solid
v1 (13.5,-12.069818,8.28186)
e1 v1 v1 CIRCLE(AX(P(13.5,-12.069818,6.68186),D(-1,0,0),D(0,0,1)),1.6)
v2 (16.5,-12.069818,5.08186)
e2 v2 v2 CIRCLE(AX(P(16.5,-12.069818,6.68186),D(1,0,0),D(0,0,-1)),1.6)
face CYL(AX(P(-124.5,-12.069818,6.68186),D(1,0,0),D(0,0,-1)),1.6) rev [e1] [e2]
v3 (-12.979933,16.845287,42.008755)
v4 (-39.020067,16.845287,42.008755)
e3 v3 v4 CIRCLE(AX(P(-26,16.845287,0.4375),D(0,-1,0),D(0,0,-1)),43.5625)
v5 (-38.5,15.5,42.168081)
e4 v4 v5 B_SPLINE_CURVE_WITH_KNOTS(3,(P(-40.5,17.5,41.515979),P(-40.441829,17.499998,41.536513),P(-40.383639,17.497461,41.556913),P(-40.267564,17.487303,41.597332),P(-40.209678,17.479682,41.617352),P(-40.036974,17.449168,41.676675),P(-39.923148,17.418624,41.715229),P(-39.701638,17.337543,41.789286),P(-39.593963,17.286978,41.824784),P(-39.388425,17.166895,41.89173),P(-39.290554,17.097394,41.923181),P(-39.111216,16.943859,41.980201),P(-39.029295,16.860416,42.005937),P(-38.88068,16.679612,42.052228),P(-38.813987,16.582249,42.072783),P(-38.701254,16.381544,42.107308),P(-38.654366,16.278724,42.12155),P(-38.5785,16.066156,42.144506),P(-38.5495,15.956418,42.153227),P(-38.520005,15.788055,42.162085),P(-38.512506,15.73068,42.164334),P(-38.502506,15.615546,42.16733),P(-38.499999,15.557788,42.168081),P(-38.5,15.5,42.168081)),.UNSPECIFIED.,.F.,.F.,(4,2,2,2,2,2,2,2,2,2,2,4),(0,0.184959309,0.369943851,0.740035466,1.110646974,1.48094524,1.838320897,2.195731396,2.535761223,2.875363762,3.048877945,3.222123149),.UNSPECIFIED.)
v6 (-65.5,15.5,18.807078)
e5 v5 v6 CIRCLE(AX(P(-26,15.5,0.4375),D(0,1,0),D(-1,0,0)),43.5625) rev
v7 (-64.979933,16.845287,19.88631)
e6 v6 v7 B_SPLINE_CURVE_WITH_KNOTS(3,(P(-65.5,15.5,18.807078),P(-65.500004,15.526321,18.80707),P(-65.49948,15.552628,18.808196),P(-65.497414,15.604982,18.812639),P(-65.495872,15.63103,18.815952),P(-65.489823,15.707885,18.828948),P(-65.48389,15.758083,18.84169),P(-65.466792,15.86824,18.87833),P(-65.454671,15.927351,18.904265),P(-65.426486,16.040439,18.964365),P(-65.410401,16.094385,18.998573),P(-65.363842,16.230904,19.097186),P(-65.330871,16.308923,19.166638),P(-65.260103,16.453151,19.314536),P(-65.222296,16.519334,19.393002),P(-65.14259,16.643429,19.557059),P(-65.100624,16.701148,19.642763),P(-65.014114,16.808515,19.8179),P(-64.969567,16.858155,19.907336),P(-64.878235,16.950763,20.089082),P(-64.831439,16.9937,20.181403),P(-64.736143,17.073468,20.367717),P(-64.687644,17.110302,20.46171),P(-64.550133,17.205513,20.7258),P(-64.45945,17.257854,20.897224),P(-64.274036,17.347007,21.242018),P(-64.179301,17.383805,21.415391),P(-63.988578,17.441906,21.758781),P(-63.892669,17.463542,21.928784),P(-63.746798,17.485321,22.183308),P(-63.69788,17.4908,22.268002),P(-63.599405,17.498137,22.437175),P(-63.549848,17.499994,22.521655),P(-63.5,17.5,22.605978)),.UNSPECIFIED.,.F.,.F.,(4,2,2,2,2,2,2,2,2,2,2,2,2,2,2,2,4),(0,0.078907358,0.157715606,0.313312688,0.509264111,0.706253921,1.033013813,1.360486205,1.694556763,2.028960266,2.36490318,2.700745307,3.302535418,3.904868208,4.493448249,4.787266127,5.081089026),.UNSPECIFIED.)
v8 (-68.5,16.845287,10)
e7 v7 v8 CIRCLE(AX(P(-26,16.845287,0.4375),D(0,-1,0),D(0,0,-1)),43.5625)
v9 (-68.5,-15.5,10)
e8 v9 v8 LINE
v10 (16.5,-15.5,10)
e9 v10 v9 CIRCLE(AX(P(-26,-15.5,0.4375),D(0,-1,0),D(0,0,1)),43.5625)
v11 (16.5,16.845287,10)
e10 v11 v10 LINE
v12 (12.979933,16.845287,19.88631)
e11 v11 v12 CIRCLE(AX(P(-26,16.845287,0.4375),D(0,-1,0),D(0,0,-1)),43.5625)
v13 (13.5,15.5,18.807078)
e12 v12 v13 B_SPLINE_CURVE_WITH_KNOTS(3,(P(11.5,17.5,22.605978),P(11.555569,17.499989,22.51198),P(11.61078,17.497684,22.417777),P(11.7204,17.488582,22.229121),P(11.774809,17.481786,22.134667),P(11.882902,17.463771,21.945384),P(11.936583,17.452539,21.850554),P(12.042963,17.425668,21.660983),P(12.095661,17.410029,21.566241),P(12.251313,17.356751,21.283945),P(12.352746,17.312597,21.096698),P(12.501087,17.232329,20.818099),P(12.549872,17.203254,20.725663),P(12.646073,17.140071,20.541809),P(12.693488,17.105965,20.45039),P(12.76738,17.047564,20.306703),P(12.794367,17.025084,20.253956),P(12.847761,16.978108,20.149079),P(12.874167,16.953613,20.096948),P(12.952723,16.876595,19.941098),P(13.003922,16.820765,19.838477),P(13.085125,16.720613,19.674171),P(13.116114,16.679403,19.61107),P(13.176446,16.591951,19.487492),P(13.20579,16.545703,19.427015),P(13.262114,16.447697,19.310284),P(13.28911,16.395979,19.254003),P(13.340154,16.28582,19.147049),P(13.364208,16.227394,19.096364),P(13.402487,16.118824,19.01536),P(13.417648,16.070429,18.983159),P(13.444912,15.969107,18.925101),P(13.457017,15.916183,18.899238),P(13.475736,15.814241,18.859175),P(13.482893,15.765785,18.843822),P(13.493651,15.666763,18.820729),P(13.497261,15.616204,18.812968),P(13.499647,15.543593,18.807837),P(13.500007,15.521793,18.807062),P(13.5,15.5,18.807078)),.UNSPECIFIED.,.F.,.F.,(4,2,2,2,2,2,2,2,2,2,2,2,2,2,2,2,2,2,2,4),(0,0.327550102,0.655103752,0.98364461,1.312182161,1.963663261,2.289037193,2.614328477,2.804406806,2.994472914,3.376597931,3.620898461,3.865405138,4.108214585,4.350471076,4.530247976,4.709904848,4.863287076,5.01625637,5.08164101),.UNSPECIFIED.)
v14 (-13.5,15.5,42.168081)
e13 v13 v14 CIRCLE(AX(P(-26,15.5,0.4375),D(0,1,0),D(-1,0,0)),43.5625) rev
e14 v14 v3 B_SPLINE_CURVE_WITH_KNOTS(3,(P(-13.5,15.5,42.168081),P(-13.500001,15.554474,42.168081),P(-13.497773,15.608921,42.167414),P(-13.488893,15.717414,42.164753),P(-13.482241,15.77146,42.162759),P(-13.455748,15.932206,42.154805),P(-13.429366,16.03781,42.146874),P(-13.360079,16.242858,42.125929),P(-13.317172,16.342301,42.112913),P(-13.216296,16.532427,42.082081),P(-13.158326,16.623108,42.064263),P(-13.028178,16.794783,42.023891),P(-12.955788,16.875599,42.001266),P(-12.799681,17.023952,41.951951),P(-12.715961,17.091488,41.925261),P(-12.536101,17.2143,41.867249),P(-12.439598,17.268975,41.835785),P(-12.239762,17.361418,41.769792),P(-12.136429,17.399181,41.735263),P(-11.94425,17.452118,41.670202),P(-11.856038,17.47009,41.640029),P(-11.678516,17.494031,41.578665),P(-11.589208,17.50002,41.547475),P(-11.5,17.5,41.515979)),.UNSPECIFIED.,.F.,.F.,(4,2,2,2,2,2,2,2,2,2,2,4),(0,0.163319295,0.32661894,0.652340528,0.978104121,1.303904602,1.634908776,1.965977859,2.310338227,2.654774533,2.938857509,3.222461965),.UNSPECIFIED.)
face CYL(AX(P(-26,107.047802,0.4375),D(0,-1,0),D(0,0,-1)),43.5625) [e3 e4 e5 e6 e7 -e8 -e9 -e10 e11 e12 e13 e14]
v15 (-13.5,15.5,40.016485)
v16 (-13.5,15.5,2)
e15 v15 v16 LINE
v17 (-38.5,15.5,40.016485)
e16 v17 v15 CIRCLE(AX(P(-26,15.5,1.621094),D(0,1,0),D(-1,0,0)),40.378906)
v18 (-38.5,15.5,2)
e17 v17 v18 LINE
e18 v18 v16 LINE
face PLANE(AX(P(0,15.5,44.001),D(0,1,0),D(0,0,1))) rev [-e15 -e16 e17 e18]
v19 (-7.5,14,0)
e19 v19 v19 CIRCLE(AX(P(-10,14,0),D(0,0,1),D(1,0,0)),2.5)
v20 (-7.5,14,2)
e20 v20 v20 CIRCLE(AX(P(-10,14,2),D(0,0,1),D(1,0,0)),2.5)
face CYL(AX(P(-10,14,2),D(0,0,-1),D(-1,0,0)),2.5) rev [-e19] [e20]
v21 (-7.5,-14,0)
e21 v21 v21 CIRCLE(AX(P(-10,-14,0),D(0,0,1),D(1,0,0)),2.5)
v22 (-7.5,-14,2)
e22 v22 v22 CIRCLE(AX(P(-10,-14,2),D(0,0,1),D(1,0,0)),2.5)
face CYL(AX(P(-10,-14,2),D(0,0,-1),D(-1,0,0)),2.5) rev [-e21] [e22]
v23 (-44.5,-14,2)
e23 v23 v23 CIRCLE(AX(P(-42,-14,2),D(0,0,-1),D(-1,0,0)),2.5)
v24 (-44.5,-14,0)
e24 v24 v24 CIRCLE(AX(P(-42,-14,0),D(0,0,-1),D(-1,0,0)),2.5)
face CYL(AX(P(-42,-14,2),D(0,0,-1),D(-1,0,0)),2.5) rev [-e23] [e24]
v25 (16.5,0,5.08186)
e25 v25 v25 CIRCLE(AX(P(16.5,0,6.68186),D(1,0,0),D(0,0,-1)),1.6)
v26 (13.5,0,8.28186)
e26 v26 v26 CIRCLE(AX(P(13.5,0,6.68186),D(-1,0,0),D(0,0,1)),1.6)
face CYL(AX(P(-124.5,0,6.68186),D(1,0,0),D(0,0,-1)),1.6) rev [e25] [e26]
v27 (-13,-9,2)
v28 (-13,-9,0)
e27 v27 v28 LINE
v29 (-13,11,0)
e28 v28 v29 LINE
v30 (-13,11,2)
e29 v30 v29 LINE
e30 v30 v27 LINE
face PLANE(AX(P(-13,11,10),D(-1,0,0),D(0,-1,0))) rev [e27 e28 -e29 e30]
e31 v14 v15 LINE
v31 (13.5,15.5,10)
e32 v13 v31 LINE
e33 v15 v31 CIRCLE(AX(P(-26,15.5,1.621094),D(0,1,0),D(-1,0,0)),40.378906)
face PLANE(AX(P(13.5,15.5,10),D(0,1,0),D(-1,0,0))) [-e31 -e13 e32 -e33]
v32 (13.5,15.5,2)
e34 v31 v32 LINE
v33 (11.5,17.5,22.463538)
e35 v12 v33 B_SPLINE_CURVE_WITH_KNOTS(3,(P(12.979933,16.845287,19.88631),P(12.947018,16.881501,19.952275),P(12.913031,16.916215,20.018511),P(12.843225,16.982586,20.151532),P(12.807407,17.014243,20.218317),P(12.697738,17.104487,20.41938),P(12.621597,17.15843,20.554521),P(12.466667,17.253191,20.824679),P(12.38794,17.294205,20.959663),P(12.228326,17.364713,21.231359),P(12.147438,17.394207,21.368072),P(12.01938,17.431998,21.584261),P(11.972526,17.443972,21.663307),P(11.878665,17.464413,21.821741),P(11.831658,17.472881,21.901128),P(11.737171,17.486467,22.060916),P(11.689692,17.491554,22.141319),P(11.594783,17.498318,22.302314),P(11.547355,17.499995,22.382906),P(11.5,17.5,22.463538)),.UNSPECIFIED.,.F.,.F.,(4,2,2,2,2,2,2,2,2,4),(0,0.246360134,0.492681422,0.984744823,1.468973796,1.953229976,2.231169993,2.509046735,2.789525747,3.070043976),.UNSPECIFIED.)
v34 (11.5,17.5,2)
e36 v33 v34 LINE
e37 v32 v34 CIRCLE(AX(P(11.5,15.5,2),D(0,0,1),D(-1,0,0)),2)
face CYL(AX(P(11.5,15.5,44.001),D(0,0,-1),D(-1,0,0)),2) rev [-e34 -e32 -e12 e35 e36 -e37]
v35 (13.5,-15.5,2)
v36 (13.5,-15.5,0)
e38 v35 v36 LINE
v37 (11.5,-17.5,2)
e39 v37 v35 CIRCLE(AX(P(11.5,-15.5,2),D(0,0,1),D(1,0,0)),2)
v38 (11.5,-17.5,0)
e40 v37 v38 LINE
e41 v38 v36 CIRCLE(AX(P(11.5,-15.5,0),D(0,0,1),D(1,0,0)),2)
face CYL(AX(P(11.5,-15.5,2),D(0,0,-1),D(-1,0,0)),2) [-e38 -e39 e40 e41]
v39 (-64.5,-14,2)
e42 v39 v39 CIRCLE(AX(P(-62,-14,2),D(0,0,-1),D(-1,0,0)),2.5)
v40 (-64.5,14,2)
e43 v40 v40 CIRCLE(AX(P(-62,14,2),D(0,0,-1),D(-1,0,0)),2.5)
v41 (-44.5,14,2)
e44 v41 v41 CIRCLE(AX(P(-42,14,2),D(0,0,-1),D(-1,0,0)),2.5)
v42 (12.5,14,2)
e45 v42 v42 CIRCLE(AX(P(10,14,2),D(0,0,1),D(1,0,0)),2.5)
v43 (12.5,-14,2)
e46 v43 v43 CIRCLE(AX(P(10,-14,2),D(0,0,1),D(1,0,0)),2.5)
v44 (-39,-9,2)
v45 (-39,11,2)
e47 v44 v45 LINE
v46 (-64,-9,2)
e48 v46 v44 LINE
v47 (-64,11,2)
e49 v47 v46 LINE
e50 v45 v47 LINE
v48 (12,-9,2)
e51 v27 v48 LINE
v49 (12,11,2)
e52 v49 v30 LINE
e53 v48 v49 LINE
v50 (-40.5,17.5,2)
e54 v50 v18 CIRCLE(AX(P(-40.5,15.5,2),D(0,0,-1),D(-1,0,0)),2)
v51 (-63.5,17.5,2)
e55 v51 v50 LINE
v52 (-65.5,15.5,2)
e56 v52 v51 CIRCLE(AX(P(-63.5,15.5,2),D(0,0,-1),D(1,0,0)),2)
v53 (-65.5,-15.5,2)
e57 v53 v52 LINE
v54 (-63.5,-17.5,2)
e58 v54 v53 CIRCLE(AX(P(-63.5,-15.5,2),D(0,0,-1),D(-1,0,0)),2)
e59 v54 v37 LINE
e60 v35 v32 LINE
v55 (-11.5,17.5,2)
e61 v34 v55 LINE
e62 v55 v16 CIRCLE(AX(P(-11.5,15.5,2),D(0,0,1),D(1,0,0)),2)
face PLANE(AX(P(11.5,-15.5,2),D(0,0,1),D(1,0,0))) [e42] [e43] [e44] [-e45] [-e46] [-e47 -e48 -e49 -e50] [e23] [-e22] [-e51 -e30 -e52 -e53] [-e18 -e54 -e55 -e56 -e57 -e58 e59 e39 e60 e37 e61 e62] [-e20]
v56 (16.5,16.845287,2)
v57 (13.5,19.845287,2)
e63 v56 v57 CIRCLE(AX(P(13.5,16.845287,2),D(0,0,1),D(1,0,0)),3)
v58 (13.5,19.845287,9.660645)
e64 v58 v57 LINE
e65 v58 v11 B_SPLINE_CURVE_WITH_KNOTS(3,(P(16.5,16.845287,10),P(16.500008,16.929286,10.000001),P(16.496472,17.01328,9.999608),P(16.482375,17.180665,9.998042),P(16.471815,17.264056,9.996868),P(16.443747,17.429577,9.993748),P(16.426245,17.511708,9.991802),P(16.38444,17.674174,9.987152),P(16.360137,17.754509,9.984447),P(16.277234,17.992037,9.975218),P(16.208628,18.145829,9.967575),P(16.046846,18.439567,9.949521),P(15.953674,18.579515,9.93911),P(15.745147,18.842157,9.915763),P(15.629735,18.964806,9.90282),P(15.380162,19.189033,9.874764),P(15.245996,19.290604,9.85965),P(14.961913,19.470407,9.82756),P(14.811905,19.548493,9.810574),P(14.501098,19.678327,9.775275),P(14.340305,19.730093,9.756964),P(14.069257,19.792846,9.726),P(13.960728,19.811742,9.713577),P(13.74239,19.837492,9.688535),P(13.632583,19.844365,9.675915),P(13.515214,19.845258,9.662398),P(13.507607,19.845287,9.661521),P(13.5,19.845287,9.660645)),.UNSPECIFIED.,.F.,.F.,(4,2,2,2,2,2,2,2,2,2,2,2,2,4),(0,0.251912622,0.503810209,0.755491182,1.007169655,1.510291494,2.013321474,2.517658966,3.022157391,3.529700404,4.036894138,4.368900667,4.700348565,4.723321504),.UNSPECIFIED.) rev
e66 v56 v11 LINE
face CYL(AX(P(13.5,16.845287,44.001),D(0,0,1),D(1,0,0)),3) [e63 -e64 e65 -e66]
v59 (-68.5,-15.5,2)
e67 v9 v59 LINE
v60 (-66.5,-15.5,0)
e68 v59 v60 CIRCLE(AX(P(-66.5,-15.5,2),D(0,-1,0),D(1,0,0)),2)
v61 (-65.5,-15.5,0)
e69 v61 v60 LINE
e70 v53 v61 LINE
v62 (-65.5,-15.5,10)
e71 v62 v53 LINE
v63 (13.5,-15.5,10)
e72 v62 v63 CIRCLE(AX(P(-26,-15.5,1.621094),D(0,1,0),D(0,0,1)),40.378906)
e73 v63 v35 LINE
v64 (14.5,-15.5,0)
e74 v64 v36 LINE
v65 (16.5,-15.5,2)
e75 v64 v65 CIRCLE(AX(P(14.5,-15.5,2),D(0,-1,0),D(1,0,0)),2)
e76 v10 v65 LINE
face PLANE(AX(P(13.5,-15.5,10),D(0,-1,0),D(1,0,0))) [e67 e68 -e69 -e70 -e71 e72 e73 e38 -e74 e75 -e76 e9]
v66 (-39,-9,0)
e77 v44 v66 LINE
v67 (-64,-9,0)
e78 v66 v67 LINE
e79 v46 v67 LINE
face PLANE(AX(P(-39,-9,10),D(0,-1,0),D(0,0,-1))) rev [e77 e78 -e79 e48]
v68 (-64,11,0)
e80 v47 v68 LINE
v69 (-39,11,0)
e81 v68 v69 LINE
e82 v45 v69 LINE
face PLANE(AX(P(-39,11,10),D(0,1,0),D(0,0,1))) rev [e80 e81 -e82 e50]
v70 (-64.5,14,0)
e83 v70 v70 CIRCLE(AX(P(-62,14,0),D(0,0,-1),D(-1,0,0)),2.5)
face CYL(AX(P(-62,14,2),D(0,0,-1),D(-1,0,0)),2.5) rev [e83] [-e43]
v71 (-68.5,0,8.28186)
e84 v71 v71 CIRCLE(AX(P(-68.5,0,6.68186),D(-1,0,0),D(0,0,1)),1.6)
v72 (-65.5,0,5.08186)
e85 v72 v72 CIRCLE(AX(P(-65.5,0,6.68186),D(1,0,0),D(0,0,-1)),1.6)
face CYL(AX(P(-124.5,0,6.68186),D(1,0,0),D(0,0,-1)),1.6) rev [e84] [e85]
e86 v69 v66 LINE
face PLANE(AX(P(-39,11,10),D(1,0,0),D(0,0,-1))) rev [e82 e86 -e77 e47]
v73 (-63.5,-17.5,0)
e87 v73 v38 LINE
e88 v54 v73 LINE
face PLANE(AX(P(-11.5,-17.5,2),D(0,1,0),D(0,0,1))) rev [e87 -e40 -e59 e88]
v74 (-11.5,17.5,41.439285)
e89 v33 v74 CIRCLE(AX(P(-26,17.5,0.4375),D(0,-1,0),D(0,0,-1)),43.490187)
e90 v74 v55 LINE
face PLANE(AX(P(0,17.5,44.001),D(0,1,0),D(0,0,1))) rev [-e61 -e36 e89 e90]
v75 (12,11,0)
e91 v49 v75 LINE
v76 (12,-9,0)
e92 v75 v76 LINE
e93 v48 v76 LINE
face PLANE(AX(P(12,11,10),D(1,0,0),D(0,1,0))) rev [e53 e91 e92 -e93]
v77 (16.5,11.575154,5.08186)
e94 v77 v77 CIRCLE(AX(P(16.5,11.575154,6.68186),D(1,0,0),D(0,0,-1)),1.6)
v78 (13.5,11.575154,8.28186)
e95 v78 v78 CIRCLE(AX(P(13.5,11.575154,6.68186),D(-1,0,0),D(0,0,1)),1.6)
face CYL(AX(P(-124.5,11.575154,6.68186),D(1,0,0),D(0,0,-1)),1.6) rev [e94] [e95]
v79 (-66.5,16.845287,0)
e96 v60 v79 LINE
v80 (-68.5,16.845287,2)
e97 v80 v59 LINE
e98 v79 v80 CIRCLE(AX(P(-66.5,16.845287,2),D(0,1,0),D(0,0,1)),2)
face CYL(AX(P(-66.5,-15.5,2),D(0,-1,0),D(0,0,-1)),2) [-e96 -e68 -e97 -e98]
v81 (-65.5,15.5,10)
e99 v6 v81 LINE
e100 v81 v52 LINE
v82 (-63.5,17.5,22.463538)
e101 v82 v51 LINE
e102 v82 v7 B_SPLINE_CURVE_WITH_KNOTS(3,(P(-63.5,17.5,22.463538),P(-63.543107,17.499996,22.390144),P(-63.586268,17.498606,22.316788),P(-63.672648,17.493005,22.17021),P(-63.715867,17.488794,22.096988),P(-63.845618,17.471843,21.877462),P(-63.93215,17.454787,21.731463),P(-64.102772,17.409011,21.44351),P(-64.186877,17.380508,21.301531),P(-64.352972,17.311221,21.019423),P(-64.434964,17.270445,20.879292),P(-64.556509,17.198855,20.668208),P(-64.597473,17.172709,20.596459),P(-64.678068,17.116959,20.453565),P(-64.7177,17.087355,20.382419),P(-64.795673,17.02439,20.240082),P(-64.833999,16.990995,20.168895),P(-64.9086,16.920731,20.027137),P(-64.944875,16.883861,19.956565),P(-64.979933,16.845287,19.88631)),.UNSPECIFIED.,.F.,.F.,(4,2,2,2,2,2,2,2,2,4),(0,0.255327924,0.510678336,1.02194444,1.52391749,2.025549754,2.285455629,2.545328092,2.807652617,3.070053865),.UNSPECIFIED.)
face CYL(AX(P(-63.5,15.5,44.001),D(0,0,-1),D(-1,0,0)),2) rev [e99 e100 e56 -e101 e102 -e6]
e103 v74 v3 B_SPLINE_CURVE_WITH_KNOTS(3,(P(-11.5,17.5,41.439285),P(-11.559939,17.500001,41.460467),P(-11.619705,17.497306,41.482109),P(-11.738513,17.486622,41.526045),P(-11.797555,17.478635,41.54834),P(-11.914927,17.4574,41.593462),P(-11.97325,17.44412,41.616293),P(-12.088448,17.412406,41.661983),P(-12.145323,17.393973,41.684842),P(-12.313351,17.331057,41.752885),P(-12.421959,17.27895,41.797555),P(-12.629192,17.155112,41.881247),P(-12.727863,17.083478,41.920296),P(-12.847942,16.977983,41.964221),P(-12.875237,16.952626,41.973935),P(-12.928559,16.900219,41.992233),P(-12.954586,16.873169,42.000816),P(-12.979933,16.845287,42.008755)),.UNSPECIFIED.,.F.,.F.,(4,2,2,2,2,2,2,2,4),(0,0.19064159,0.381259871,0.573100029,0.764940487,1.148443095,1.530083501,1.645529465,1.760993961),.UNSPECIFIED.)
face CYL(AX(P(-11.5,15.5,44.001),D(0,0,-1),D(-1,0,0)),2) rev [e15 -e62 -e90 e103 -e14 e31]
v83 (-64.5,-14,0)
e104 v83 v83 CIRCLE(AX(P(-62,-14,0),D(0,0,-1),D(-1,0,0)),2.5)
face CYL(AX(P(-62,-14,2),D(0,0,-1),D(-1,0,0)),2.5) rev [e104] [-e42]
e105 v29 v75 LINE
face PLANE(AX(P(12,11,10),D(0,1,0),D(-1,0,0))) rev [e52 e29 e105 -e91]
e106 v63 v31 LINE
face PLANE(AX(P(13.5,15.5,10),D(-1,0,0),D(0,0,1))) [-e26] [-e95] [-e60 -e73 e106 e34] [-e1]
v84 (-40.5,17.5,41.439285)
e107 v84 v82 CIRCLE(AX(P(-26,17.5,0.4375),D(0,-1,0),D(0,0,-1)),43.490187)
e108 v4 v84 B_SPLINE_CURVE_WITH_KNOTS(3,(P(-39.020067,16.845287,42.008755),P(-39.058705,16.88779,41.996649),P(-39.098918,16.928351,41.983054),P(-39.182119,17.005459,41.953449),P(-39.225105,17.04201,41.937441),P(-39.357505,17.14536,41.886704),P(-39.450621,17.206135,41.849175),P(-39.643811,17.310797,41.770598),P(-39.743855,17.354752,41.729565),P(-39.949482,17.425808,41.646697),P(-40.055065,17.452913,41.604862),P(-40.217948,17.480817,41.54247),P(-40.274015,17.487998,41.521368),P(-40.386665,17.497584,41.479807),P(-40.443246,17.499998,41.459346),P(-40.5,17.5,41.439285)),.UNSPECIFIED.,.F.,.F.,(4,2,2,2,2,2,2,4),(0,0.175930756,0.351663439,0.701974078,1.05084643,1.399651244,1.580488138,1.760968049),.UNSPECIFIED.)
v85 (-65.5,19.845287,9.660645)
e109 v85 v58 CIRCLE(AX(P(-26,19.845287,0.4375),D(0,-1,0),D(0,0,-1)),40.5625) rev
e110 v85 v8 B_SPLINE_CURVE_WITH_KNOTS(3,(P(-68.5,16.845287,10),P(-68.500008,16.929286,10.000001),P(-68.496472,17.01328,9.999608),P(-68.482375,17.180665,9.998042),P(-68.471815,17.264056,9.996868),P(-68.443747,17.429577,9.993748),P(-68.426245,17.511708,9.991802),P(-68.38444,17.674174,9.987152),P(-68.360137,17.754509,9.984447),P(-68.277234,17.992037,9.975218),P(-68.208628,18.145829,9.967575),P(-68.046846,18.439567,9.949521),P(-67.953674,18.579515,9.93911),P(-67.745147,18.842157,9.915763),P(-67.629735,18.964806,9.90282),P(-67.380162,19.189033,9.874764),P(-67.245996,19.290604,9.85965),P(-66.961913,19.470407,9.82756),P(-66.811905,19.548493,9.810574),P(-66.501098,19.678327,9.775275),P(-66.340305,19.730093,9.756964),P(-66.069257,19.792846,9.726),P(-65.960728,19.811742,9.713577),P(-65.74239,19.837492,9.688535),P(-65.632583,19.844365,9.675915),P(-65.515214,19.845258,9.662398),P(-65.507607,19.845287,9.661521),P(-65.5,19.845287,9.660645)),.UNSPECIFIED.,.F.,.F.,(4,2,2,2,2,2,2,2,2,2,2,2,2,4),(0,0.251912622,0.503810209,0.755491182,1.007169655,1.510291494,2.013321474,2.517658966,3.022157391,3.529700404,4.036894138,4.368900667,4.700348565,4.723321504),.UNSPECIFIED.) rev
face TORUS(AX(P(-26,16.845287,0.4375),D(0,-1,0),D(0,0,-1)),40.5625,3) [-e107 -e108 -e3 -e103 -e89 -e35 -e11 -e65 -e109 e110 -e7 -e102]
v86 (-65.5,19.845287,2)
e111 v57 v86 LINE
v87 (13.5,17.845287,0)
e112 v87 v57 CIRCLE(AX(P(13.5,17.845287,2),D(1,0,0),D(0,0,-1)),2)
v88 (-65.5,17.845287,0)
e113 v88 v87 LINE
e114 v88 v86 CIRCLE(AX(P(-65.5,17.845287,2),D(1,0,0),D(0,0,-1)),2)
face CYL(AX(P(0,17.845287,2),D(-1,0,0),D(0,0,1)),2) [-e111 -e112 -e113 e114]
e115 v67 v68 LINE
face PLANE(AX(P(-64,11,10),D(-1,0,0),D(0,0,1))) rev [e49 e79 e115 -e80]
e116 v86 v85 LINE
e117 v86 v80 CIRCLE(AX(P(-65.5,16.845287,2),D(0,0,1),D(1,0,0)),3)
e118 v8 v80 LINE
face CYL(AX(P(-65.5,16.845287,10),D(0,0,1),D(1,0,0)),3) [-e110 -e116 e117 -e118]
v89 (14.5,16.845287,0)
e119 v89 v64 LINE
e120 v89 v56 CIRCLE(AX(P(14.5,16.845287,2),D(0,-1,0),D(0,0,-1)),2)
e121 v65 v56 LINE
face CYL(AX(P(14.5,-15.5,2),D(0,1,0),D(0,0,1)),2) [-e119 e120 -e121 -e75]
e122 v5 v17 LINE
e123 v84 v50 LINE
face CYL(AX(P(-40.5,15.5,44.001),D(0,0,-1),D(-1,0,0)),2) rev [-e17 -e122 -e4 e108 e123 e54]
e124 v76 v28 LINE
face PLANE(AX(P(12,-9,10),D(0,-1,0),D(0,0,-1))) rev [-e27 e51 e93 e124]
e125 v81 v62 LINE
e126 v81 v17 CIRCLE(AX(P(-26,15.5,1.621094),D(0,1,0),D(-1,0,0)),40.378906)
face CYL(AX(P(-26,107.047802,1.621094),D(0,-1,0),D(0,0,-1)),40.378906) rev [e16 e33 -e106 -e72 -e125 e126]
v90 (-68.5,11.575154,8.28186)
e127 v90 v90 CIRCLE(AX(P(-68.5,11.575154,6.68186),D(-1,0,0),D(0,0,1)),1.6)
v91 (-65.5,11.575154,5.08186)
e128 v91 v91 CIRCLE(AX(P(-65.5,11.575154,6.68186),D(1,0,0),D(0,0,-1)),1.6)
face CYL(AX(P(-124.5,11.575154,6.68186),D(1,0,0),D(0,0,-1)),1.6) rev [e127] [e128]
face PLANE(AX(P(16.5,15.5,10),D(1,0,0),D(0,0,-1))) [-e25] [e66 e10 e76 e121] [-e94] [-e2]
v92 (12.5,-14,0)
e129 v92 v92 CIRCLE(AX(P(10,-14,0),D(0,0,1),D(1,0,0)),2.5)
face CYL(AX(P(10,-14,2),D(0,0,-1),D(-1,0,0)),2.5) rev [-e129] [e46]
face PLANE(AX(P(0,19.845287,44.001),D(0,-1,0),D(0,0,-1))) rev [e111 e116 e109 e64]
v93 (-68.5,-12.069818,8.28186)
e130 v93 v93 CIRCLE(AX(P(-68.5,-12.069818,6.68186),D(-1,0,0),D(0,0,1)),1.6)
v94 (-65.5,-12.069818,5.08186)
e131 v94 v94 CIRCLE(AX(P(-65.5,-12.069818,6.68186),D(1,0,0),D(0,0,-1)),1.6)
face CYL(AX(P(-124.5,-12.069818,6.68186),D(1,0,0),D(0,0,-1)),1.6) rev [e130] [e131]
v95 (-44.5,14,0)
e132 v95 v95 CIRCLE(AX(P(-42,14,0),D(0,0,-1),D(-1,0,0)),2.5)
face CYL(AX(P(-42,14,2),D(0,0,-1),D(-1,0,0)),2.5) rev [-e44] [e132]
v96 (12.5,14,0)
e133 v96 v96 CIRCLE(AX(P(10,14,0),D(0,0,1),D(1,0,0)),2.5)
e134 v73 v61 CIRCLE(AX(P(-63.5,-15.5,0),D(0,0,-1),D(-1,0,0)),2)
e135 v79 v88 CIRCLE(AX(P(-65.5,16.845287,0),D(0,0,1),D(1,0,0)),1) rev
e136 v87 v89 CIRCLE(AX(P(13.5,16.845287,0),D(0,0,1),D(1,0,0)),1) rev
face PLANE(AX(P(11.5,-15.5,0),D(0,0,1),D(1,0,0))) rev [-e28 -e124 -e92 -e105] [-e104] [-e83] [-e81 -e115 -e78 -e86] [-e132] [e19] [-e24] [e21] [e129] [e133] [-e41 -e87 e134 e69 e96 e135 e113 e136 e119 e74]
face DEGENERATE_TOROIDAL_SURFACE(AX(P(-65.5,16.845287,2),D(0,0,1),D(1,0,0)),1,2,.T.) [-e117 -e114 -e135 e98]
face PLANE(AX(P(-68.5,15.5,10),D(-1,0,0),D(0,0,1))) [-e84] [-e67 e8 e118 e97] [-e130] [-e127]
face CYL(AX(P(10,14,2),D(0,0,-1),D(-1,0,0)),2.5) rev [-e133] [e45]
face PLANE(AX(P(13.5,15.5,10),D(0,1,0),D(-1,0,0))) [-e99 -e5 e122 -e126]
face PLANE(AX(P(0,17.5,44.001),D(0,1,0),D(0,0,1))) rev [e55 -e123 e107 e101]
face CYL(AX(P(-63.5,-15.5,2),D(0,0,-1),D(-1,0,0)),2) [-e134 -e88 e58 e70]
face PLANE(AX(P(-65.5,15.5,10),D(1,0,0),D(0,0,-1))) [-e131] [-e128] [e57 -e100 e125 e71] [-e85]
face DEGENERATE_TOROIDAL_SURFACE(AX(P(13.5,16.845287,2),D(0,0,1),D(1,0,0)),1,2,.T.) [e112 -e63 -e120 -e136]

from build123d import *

# Parameters (mm, degrees)
IZIM1_R                          = 2.5
Y_KSEKLIK_EKSTR_ZYON1_DEPTH      = 2
IZIM2_W                          = 25
IZIM2_H                          = 31
Y_KSEKLIK_EKSTR_ZYON2_DEPTH      = 2
IZIM3_W                          = 0.888238836
IZIM3_H                          = 3.17016103
KES_EKSTR_ZYON1_DEPTH            = 2
IZIM6_W                          = 3
IZIM6_H                          = 31
Y_KSEKLIK_EKSTR_ZYON3_DEPTH      = 10
IZIM7_R                          = 1.6
KES_EKSTR_ZYON2_DEPTH            = 141
IZIM8_W                          = 4.55247788
IZIM8_H                          = 5.743045402
Y_KSEKLIK_EKSTR_ZYON4_DEPTH      = 2
Y_KSEKLIK_EKSTR_ZYON5_DEPTH      = 31
Y_KSEKLIK_EKSTR_ZYON6_REACH      = 85.274
Y_KSEKLIK_EKSTR_ZYON6_END_RADIUS = 43.5625
RADYUS1_R                        = 3
RADYUS2_R                        = 2
IZIM11_W                         = 25
IZIM11_H                         = 20
KES_EKSTR_ZYON3_DEPTH            = 10
Y_KSEKLIK_EKSTR_ZYON7_DEPTH      = 2


with BuildPart() as part:
    # Çizim1 → Yükseklik-Ekstrüzyon1 (new body)
    with BuildSketch(Plane.XY):
        with BuildLine():
            Line((-11.5, 17.5), (11.5, 17.5))
            ThreePointArc((11.5, 17.5), (12.914213562, 16.914213562), (13.5, 15.5))
            Line((13.5, 15.5), (13.5, -15.5))
            ThreePointArc((13.5, -15.5), (12.914213562, -16.914213562), (11.5, -17.5))
            Line((11.5, -17.5), (-11.5, -17.5))
            ThreePointArc((-11.5, -17.5), (-12.914213562, -16.914213562), (-13.5, -15.5))
            Line((-13.5, -15.5), (-13.5, 15.5))
            ThreePointArc((-13.5, 15.5), (-12.914213562, 16.914213562), (-11.5, 17.5))
        make_face()
        with Locations((-10, 14)):
            Circle(IZIM1_R, mode=Mode.SUBTRACT)
        with Locations((-10, -14)):
            Circle(IZIM1_R, mode=Mode.SUBTRACT)
        with Locations((10, 14)):
            Circle(IZIM1_R, mode=Mode.SUBTRACT)
        with Locations((10, -14)):
            Circle(IZIM1_R, mode=Mode.SUBTRACT)
    y_kseklik_ekstr_zyon1 = extrude(amount=Y_KSEKLIK_EKSTR_ZYON1_DEPTH)

    # Çizim2 → Yükseklik-Ekstrüzyon2 (add)
    with BuildSketch(Plane(origin=(0, 0, 0), x_dir=(-1, 0, 0), z_dir=(0, 0, -1))):
        with Locations((26, 0)):
            Rectangle(IZIM2_W, IZIM2_H)
    extrude(amount=-Y_KSEKLIK_EKSTR_ZYON2_DEPTH)

    # Çizim3 → Kes-Ekstrüzyon1 (cut)
    with BuildSketch(Plane(origin=(0, 0, 0), x_dir=(-1, 0, 0), z_dir=(0, 0, -1))):
        with Locations((26.444119418, 13.914919485)):
            Rectangle(IZIM3_W, IZIM3_H)
    extrude(amount=-KES_EKSTR_ZYON1_DEPTH, mode=Mode.SUBTRACT)

    # Aynalama4: Yükseklik-Ekstrüzyon1 across plane
    add(y_kseklik_ekstr_zyon1.mirror(Plane(origin=(-26, 15.5, 2), x_dir=(0, 0, 1), z_dir=(1, 0, 0))))

    # Çizim6 → Yükseklik-Ekstrüzyon3 (add)
    with BuildSketch(Plane(origin=(0, 0, 0), x_dir=(-1, 0, 0), z_dir=(0, 0, -1))):
        with Locations((-15, 0)):
            Rectangle(IZIM6_W, IZIM6_H)
        with Locations((67, 0)):
            Rectangle(IZIM6_W, IZIM6_H)
    extrude(amount=-Y_KSEKLIK_EKSTR_ZYON3_DEPTH)

    # Çizim7 → Kes-Ekstrüzyon2 (cut)
    with BuildSketch(Plane(origin=(16.5, 0, 0), x_dir=(0, 0, -1), z_dir=(1, 0, 0))):
        with Locations((-6.681859939, 11.575153699)):
            Circle(IZIM7_R)
        with Locations((-6.681859939, 0)):
            Circle(IZIM7_R)
        with Locations((-6.681859939, -12.069818387)):
            Circle(IZIM7_R)
    extrude(amount=-KES_EKSTR_ZYON2_DEPTH, mode=Mode.SUBTRACT)

    # Çizim8 → Yükseklik-Ekstrüzyon4 (add)
    with BuildSketch(Plane(origin=(0, 0, 0), x_dir=(-1, 0, 0), z_dir=(0, 0, -1))):
        with Locations((26.803888867, 12.628477299)):
            Rectangle(IZIM8_W, IZIM8_H)
    extrude(amount=-Y_KSEKLIK_EKSTR_ZYON4_DEPTH)

    # Çizim9 → Yükseklik-Ekstrüzyon5 (add)
    with BuildSketch(Plane.XZ.offset(15.5)):
        with BuildLine():
            Line((-68.5, 10), (-65.5, 10))
            ThreePointArc((-65.5, 10), (-26, 42), (13.5, 10))
            Line((13.5, 10), (16.5, 10))
            ThreePointArc((16.5, 10), (-26, 44), (-68.5, 10))
        make_face()
    extrude(amount=-Y_KSEKLIK_EKSTR_ZYON5_DEPTH)

    # Yükseklik-Ekstrüzyon6: up to this cylinder (the profile starts inside it)
    y_kseklik_ekstr_zyon6_end = Plane(origin=(-26, 18.142911, 0.4375), z_dir=(0, -1, 0)) * Cylinder(Y_KSEKLIK_EKSTR_ZYON6_END_RADIUS, 258.673, mode=Mode.PRIVATE)
    # Çizim10 → Yükseklik-Ekstrüzyon6 (add, up to the surface)
    with BuildSketch(Plane(origin=(0, 0, 0), x_dir=(-1, 0, 0), z_dir=(0, 0, -1)), mode=Mode.PRIVATE) as y_kseklik_ekstr_zyon6_sk1:
        with BuildLine():
            Line((68.5, 19.845287322), (68.5, 15.5))
            Line((68.5, 15.5), (65.5, 15.5))
            ThreePointArc((65.5, 15.5), (64.914213562, 16.914213562), (63.5, 17.5))
            Line((63.5, 17.5), (40.5, 17.5))
            ThreePointArc((40.5, 17.5), (39.085786438, 16.914213562), (38.5, 15.5))
            Line((38.5, 15.5), (13.5, 15.5))
            ThreePointArc((13.5, 15.5), (12.914213562, 16.914213562), (11.5, 17.5))
            Line((11.5, 17.5), (-11.5, 17.5))
            ThreePointArc((-11.5, 17.5), (-12.914213562, 16.914213562), (-13.5, 15.5))
            Line((-13.5, 15.5), (-16.5, 15.5))
            Line((-16.5, 15.5), (-16.5, 19.845287322))
            Line((-16.5, 19.845287322), (68.5, 19.845287322))
        make_face()
    y_kseklik_ekstr_zyon6_tool1 = extrude(y_kseklik_ekstr_zyon6_sk1.sketch, amount=-Y_KSEKLIK_EKSTR_ZYON6_REACH, mode=Mode.PRIVATE) & y_kseklik_ekstr_zyon6_end
    add(y_kseklik_ekstr_zyon6_tool1.solids().sort_by_distance((-26, 18.142911, 0))[0])

    # Radyus1
    # the kernel refuses this fillet: 3 mm, written as the material it takes off along each edge
    with BuildSketch(Plane(origin=(-68.5, 19.845287322, -7.5), x_dir=(1, 0, 0), z_dir=(0, 0, 1)), Plane(origin=(16.5, 19.845287322, -7.5), x_dir=(0, -1, 0), z_dir=(0, 0, 1))) as radyus1_piece_1:
        with BuildLine():
            CenterArc((RADYUS1_R, -RADYUS1_R), RADYUS1_R, 90, 90)
            Line((0, -RADYUS1_R), (0, 0))
            Line((0, 0), (RADYUS1_R, 0))
        make_face()
    extrude(amount=25, mode=Mode.SUBTRACT)
    with BuildSketch(Plane(origin=(-26, 19.845287322, 0.4375), x_dir=(0.9988024950915276, 0, 0.04892418419288032), z_dir=(0.04892418419288032, 0, -0.9988024950915276))) as radyus1_piece_2:
        with BuildLine():
            CenterArc((43.5625 - RADYUS1_R, RADYUS1_R), RADYUS1_R, 270, 90)
            Line((43.5625 - RADYUS1_R, 0), (43.5625, 0))
            Line((43.5625, 0), (43.5625, RADYUS1_R))
        make_face()
    revolve(axis=Axis((-26, 19.845287322, 0.4375), (0, -1, 0)), revolution_arc=174.39146253, mode=Mode.SUBTRACT)

    # Radyus2
    radyus2_edges = [part.edges().sort_by_distance(p)[0] for p in [
        (-68.5, 0.672643661, 0),
        (-26, 19.845287322, 0),
        (16.5, 0.672643661, 0),
        (-67.621320344, 18.966607666, 0),
        (15.621320344, 18.966607666, 0),
    ]]
    fillet(radyus2_edges, radius=RADYUS2_R)

    # Çizim11 → Kes-Ekstrüzyon3 (cut)
    with BuildSketch(Plane(origin=(0, 0, 0), x_dir=(-1, 0, 0), z_dir=(0, 0, -1))):
        with Locations((51.5, 1)):
            Rectangle(IZIM11_W, IZIM11_H)
        with Locations((0.5, 1)):
            Rectangle(IZIM11_W, IZIM11_H)
    extrude(amount=-KES_EKSTR_ZYON3_DEPTH, mode=Mode.SUBTRACT)

    # Çizim12 → Yükseklik-Ekstrüzyon7 (add)
    with BuildSketch(Plane(origin=(0, 0, 0), x_dir=(-1, 0, 0), z_dir=(0, 0, -1))):
        with BuildLine():
            Line((11.5, -17.5), (40.5, -17.5))
            ThreePointArc((40.5, -17.5), (39.085786438, -16.914213562), (38.5, -15.5))
            Line((38.5, -15.5), (13.5, -15.5))
            ThreePointArc((13.5, -15.5), (12.914213562, -16.914213562), (11.5, -17.5))
        make_face()
    extrude(amount=-Y_KSEKLIK_EKSTR_ZYON7_DEPTH)


solid = part.part
